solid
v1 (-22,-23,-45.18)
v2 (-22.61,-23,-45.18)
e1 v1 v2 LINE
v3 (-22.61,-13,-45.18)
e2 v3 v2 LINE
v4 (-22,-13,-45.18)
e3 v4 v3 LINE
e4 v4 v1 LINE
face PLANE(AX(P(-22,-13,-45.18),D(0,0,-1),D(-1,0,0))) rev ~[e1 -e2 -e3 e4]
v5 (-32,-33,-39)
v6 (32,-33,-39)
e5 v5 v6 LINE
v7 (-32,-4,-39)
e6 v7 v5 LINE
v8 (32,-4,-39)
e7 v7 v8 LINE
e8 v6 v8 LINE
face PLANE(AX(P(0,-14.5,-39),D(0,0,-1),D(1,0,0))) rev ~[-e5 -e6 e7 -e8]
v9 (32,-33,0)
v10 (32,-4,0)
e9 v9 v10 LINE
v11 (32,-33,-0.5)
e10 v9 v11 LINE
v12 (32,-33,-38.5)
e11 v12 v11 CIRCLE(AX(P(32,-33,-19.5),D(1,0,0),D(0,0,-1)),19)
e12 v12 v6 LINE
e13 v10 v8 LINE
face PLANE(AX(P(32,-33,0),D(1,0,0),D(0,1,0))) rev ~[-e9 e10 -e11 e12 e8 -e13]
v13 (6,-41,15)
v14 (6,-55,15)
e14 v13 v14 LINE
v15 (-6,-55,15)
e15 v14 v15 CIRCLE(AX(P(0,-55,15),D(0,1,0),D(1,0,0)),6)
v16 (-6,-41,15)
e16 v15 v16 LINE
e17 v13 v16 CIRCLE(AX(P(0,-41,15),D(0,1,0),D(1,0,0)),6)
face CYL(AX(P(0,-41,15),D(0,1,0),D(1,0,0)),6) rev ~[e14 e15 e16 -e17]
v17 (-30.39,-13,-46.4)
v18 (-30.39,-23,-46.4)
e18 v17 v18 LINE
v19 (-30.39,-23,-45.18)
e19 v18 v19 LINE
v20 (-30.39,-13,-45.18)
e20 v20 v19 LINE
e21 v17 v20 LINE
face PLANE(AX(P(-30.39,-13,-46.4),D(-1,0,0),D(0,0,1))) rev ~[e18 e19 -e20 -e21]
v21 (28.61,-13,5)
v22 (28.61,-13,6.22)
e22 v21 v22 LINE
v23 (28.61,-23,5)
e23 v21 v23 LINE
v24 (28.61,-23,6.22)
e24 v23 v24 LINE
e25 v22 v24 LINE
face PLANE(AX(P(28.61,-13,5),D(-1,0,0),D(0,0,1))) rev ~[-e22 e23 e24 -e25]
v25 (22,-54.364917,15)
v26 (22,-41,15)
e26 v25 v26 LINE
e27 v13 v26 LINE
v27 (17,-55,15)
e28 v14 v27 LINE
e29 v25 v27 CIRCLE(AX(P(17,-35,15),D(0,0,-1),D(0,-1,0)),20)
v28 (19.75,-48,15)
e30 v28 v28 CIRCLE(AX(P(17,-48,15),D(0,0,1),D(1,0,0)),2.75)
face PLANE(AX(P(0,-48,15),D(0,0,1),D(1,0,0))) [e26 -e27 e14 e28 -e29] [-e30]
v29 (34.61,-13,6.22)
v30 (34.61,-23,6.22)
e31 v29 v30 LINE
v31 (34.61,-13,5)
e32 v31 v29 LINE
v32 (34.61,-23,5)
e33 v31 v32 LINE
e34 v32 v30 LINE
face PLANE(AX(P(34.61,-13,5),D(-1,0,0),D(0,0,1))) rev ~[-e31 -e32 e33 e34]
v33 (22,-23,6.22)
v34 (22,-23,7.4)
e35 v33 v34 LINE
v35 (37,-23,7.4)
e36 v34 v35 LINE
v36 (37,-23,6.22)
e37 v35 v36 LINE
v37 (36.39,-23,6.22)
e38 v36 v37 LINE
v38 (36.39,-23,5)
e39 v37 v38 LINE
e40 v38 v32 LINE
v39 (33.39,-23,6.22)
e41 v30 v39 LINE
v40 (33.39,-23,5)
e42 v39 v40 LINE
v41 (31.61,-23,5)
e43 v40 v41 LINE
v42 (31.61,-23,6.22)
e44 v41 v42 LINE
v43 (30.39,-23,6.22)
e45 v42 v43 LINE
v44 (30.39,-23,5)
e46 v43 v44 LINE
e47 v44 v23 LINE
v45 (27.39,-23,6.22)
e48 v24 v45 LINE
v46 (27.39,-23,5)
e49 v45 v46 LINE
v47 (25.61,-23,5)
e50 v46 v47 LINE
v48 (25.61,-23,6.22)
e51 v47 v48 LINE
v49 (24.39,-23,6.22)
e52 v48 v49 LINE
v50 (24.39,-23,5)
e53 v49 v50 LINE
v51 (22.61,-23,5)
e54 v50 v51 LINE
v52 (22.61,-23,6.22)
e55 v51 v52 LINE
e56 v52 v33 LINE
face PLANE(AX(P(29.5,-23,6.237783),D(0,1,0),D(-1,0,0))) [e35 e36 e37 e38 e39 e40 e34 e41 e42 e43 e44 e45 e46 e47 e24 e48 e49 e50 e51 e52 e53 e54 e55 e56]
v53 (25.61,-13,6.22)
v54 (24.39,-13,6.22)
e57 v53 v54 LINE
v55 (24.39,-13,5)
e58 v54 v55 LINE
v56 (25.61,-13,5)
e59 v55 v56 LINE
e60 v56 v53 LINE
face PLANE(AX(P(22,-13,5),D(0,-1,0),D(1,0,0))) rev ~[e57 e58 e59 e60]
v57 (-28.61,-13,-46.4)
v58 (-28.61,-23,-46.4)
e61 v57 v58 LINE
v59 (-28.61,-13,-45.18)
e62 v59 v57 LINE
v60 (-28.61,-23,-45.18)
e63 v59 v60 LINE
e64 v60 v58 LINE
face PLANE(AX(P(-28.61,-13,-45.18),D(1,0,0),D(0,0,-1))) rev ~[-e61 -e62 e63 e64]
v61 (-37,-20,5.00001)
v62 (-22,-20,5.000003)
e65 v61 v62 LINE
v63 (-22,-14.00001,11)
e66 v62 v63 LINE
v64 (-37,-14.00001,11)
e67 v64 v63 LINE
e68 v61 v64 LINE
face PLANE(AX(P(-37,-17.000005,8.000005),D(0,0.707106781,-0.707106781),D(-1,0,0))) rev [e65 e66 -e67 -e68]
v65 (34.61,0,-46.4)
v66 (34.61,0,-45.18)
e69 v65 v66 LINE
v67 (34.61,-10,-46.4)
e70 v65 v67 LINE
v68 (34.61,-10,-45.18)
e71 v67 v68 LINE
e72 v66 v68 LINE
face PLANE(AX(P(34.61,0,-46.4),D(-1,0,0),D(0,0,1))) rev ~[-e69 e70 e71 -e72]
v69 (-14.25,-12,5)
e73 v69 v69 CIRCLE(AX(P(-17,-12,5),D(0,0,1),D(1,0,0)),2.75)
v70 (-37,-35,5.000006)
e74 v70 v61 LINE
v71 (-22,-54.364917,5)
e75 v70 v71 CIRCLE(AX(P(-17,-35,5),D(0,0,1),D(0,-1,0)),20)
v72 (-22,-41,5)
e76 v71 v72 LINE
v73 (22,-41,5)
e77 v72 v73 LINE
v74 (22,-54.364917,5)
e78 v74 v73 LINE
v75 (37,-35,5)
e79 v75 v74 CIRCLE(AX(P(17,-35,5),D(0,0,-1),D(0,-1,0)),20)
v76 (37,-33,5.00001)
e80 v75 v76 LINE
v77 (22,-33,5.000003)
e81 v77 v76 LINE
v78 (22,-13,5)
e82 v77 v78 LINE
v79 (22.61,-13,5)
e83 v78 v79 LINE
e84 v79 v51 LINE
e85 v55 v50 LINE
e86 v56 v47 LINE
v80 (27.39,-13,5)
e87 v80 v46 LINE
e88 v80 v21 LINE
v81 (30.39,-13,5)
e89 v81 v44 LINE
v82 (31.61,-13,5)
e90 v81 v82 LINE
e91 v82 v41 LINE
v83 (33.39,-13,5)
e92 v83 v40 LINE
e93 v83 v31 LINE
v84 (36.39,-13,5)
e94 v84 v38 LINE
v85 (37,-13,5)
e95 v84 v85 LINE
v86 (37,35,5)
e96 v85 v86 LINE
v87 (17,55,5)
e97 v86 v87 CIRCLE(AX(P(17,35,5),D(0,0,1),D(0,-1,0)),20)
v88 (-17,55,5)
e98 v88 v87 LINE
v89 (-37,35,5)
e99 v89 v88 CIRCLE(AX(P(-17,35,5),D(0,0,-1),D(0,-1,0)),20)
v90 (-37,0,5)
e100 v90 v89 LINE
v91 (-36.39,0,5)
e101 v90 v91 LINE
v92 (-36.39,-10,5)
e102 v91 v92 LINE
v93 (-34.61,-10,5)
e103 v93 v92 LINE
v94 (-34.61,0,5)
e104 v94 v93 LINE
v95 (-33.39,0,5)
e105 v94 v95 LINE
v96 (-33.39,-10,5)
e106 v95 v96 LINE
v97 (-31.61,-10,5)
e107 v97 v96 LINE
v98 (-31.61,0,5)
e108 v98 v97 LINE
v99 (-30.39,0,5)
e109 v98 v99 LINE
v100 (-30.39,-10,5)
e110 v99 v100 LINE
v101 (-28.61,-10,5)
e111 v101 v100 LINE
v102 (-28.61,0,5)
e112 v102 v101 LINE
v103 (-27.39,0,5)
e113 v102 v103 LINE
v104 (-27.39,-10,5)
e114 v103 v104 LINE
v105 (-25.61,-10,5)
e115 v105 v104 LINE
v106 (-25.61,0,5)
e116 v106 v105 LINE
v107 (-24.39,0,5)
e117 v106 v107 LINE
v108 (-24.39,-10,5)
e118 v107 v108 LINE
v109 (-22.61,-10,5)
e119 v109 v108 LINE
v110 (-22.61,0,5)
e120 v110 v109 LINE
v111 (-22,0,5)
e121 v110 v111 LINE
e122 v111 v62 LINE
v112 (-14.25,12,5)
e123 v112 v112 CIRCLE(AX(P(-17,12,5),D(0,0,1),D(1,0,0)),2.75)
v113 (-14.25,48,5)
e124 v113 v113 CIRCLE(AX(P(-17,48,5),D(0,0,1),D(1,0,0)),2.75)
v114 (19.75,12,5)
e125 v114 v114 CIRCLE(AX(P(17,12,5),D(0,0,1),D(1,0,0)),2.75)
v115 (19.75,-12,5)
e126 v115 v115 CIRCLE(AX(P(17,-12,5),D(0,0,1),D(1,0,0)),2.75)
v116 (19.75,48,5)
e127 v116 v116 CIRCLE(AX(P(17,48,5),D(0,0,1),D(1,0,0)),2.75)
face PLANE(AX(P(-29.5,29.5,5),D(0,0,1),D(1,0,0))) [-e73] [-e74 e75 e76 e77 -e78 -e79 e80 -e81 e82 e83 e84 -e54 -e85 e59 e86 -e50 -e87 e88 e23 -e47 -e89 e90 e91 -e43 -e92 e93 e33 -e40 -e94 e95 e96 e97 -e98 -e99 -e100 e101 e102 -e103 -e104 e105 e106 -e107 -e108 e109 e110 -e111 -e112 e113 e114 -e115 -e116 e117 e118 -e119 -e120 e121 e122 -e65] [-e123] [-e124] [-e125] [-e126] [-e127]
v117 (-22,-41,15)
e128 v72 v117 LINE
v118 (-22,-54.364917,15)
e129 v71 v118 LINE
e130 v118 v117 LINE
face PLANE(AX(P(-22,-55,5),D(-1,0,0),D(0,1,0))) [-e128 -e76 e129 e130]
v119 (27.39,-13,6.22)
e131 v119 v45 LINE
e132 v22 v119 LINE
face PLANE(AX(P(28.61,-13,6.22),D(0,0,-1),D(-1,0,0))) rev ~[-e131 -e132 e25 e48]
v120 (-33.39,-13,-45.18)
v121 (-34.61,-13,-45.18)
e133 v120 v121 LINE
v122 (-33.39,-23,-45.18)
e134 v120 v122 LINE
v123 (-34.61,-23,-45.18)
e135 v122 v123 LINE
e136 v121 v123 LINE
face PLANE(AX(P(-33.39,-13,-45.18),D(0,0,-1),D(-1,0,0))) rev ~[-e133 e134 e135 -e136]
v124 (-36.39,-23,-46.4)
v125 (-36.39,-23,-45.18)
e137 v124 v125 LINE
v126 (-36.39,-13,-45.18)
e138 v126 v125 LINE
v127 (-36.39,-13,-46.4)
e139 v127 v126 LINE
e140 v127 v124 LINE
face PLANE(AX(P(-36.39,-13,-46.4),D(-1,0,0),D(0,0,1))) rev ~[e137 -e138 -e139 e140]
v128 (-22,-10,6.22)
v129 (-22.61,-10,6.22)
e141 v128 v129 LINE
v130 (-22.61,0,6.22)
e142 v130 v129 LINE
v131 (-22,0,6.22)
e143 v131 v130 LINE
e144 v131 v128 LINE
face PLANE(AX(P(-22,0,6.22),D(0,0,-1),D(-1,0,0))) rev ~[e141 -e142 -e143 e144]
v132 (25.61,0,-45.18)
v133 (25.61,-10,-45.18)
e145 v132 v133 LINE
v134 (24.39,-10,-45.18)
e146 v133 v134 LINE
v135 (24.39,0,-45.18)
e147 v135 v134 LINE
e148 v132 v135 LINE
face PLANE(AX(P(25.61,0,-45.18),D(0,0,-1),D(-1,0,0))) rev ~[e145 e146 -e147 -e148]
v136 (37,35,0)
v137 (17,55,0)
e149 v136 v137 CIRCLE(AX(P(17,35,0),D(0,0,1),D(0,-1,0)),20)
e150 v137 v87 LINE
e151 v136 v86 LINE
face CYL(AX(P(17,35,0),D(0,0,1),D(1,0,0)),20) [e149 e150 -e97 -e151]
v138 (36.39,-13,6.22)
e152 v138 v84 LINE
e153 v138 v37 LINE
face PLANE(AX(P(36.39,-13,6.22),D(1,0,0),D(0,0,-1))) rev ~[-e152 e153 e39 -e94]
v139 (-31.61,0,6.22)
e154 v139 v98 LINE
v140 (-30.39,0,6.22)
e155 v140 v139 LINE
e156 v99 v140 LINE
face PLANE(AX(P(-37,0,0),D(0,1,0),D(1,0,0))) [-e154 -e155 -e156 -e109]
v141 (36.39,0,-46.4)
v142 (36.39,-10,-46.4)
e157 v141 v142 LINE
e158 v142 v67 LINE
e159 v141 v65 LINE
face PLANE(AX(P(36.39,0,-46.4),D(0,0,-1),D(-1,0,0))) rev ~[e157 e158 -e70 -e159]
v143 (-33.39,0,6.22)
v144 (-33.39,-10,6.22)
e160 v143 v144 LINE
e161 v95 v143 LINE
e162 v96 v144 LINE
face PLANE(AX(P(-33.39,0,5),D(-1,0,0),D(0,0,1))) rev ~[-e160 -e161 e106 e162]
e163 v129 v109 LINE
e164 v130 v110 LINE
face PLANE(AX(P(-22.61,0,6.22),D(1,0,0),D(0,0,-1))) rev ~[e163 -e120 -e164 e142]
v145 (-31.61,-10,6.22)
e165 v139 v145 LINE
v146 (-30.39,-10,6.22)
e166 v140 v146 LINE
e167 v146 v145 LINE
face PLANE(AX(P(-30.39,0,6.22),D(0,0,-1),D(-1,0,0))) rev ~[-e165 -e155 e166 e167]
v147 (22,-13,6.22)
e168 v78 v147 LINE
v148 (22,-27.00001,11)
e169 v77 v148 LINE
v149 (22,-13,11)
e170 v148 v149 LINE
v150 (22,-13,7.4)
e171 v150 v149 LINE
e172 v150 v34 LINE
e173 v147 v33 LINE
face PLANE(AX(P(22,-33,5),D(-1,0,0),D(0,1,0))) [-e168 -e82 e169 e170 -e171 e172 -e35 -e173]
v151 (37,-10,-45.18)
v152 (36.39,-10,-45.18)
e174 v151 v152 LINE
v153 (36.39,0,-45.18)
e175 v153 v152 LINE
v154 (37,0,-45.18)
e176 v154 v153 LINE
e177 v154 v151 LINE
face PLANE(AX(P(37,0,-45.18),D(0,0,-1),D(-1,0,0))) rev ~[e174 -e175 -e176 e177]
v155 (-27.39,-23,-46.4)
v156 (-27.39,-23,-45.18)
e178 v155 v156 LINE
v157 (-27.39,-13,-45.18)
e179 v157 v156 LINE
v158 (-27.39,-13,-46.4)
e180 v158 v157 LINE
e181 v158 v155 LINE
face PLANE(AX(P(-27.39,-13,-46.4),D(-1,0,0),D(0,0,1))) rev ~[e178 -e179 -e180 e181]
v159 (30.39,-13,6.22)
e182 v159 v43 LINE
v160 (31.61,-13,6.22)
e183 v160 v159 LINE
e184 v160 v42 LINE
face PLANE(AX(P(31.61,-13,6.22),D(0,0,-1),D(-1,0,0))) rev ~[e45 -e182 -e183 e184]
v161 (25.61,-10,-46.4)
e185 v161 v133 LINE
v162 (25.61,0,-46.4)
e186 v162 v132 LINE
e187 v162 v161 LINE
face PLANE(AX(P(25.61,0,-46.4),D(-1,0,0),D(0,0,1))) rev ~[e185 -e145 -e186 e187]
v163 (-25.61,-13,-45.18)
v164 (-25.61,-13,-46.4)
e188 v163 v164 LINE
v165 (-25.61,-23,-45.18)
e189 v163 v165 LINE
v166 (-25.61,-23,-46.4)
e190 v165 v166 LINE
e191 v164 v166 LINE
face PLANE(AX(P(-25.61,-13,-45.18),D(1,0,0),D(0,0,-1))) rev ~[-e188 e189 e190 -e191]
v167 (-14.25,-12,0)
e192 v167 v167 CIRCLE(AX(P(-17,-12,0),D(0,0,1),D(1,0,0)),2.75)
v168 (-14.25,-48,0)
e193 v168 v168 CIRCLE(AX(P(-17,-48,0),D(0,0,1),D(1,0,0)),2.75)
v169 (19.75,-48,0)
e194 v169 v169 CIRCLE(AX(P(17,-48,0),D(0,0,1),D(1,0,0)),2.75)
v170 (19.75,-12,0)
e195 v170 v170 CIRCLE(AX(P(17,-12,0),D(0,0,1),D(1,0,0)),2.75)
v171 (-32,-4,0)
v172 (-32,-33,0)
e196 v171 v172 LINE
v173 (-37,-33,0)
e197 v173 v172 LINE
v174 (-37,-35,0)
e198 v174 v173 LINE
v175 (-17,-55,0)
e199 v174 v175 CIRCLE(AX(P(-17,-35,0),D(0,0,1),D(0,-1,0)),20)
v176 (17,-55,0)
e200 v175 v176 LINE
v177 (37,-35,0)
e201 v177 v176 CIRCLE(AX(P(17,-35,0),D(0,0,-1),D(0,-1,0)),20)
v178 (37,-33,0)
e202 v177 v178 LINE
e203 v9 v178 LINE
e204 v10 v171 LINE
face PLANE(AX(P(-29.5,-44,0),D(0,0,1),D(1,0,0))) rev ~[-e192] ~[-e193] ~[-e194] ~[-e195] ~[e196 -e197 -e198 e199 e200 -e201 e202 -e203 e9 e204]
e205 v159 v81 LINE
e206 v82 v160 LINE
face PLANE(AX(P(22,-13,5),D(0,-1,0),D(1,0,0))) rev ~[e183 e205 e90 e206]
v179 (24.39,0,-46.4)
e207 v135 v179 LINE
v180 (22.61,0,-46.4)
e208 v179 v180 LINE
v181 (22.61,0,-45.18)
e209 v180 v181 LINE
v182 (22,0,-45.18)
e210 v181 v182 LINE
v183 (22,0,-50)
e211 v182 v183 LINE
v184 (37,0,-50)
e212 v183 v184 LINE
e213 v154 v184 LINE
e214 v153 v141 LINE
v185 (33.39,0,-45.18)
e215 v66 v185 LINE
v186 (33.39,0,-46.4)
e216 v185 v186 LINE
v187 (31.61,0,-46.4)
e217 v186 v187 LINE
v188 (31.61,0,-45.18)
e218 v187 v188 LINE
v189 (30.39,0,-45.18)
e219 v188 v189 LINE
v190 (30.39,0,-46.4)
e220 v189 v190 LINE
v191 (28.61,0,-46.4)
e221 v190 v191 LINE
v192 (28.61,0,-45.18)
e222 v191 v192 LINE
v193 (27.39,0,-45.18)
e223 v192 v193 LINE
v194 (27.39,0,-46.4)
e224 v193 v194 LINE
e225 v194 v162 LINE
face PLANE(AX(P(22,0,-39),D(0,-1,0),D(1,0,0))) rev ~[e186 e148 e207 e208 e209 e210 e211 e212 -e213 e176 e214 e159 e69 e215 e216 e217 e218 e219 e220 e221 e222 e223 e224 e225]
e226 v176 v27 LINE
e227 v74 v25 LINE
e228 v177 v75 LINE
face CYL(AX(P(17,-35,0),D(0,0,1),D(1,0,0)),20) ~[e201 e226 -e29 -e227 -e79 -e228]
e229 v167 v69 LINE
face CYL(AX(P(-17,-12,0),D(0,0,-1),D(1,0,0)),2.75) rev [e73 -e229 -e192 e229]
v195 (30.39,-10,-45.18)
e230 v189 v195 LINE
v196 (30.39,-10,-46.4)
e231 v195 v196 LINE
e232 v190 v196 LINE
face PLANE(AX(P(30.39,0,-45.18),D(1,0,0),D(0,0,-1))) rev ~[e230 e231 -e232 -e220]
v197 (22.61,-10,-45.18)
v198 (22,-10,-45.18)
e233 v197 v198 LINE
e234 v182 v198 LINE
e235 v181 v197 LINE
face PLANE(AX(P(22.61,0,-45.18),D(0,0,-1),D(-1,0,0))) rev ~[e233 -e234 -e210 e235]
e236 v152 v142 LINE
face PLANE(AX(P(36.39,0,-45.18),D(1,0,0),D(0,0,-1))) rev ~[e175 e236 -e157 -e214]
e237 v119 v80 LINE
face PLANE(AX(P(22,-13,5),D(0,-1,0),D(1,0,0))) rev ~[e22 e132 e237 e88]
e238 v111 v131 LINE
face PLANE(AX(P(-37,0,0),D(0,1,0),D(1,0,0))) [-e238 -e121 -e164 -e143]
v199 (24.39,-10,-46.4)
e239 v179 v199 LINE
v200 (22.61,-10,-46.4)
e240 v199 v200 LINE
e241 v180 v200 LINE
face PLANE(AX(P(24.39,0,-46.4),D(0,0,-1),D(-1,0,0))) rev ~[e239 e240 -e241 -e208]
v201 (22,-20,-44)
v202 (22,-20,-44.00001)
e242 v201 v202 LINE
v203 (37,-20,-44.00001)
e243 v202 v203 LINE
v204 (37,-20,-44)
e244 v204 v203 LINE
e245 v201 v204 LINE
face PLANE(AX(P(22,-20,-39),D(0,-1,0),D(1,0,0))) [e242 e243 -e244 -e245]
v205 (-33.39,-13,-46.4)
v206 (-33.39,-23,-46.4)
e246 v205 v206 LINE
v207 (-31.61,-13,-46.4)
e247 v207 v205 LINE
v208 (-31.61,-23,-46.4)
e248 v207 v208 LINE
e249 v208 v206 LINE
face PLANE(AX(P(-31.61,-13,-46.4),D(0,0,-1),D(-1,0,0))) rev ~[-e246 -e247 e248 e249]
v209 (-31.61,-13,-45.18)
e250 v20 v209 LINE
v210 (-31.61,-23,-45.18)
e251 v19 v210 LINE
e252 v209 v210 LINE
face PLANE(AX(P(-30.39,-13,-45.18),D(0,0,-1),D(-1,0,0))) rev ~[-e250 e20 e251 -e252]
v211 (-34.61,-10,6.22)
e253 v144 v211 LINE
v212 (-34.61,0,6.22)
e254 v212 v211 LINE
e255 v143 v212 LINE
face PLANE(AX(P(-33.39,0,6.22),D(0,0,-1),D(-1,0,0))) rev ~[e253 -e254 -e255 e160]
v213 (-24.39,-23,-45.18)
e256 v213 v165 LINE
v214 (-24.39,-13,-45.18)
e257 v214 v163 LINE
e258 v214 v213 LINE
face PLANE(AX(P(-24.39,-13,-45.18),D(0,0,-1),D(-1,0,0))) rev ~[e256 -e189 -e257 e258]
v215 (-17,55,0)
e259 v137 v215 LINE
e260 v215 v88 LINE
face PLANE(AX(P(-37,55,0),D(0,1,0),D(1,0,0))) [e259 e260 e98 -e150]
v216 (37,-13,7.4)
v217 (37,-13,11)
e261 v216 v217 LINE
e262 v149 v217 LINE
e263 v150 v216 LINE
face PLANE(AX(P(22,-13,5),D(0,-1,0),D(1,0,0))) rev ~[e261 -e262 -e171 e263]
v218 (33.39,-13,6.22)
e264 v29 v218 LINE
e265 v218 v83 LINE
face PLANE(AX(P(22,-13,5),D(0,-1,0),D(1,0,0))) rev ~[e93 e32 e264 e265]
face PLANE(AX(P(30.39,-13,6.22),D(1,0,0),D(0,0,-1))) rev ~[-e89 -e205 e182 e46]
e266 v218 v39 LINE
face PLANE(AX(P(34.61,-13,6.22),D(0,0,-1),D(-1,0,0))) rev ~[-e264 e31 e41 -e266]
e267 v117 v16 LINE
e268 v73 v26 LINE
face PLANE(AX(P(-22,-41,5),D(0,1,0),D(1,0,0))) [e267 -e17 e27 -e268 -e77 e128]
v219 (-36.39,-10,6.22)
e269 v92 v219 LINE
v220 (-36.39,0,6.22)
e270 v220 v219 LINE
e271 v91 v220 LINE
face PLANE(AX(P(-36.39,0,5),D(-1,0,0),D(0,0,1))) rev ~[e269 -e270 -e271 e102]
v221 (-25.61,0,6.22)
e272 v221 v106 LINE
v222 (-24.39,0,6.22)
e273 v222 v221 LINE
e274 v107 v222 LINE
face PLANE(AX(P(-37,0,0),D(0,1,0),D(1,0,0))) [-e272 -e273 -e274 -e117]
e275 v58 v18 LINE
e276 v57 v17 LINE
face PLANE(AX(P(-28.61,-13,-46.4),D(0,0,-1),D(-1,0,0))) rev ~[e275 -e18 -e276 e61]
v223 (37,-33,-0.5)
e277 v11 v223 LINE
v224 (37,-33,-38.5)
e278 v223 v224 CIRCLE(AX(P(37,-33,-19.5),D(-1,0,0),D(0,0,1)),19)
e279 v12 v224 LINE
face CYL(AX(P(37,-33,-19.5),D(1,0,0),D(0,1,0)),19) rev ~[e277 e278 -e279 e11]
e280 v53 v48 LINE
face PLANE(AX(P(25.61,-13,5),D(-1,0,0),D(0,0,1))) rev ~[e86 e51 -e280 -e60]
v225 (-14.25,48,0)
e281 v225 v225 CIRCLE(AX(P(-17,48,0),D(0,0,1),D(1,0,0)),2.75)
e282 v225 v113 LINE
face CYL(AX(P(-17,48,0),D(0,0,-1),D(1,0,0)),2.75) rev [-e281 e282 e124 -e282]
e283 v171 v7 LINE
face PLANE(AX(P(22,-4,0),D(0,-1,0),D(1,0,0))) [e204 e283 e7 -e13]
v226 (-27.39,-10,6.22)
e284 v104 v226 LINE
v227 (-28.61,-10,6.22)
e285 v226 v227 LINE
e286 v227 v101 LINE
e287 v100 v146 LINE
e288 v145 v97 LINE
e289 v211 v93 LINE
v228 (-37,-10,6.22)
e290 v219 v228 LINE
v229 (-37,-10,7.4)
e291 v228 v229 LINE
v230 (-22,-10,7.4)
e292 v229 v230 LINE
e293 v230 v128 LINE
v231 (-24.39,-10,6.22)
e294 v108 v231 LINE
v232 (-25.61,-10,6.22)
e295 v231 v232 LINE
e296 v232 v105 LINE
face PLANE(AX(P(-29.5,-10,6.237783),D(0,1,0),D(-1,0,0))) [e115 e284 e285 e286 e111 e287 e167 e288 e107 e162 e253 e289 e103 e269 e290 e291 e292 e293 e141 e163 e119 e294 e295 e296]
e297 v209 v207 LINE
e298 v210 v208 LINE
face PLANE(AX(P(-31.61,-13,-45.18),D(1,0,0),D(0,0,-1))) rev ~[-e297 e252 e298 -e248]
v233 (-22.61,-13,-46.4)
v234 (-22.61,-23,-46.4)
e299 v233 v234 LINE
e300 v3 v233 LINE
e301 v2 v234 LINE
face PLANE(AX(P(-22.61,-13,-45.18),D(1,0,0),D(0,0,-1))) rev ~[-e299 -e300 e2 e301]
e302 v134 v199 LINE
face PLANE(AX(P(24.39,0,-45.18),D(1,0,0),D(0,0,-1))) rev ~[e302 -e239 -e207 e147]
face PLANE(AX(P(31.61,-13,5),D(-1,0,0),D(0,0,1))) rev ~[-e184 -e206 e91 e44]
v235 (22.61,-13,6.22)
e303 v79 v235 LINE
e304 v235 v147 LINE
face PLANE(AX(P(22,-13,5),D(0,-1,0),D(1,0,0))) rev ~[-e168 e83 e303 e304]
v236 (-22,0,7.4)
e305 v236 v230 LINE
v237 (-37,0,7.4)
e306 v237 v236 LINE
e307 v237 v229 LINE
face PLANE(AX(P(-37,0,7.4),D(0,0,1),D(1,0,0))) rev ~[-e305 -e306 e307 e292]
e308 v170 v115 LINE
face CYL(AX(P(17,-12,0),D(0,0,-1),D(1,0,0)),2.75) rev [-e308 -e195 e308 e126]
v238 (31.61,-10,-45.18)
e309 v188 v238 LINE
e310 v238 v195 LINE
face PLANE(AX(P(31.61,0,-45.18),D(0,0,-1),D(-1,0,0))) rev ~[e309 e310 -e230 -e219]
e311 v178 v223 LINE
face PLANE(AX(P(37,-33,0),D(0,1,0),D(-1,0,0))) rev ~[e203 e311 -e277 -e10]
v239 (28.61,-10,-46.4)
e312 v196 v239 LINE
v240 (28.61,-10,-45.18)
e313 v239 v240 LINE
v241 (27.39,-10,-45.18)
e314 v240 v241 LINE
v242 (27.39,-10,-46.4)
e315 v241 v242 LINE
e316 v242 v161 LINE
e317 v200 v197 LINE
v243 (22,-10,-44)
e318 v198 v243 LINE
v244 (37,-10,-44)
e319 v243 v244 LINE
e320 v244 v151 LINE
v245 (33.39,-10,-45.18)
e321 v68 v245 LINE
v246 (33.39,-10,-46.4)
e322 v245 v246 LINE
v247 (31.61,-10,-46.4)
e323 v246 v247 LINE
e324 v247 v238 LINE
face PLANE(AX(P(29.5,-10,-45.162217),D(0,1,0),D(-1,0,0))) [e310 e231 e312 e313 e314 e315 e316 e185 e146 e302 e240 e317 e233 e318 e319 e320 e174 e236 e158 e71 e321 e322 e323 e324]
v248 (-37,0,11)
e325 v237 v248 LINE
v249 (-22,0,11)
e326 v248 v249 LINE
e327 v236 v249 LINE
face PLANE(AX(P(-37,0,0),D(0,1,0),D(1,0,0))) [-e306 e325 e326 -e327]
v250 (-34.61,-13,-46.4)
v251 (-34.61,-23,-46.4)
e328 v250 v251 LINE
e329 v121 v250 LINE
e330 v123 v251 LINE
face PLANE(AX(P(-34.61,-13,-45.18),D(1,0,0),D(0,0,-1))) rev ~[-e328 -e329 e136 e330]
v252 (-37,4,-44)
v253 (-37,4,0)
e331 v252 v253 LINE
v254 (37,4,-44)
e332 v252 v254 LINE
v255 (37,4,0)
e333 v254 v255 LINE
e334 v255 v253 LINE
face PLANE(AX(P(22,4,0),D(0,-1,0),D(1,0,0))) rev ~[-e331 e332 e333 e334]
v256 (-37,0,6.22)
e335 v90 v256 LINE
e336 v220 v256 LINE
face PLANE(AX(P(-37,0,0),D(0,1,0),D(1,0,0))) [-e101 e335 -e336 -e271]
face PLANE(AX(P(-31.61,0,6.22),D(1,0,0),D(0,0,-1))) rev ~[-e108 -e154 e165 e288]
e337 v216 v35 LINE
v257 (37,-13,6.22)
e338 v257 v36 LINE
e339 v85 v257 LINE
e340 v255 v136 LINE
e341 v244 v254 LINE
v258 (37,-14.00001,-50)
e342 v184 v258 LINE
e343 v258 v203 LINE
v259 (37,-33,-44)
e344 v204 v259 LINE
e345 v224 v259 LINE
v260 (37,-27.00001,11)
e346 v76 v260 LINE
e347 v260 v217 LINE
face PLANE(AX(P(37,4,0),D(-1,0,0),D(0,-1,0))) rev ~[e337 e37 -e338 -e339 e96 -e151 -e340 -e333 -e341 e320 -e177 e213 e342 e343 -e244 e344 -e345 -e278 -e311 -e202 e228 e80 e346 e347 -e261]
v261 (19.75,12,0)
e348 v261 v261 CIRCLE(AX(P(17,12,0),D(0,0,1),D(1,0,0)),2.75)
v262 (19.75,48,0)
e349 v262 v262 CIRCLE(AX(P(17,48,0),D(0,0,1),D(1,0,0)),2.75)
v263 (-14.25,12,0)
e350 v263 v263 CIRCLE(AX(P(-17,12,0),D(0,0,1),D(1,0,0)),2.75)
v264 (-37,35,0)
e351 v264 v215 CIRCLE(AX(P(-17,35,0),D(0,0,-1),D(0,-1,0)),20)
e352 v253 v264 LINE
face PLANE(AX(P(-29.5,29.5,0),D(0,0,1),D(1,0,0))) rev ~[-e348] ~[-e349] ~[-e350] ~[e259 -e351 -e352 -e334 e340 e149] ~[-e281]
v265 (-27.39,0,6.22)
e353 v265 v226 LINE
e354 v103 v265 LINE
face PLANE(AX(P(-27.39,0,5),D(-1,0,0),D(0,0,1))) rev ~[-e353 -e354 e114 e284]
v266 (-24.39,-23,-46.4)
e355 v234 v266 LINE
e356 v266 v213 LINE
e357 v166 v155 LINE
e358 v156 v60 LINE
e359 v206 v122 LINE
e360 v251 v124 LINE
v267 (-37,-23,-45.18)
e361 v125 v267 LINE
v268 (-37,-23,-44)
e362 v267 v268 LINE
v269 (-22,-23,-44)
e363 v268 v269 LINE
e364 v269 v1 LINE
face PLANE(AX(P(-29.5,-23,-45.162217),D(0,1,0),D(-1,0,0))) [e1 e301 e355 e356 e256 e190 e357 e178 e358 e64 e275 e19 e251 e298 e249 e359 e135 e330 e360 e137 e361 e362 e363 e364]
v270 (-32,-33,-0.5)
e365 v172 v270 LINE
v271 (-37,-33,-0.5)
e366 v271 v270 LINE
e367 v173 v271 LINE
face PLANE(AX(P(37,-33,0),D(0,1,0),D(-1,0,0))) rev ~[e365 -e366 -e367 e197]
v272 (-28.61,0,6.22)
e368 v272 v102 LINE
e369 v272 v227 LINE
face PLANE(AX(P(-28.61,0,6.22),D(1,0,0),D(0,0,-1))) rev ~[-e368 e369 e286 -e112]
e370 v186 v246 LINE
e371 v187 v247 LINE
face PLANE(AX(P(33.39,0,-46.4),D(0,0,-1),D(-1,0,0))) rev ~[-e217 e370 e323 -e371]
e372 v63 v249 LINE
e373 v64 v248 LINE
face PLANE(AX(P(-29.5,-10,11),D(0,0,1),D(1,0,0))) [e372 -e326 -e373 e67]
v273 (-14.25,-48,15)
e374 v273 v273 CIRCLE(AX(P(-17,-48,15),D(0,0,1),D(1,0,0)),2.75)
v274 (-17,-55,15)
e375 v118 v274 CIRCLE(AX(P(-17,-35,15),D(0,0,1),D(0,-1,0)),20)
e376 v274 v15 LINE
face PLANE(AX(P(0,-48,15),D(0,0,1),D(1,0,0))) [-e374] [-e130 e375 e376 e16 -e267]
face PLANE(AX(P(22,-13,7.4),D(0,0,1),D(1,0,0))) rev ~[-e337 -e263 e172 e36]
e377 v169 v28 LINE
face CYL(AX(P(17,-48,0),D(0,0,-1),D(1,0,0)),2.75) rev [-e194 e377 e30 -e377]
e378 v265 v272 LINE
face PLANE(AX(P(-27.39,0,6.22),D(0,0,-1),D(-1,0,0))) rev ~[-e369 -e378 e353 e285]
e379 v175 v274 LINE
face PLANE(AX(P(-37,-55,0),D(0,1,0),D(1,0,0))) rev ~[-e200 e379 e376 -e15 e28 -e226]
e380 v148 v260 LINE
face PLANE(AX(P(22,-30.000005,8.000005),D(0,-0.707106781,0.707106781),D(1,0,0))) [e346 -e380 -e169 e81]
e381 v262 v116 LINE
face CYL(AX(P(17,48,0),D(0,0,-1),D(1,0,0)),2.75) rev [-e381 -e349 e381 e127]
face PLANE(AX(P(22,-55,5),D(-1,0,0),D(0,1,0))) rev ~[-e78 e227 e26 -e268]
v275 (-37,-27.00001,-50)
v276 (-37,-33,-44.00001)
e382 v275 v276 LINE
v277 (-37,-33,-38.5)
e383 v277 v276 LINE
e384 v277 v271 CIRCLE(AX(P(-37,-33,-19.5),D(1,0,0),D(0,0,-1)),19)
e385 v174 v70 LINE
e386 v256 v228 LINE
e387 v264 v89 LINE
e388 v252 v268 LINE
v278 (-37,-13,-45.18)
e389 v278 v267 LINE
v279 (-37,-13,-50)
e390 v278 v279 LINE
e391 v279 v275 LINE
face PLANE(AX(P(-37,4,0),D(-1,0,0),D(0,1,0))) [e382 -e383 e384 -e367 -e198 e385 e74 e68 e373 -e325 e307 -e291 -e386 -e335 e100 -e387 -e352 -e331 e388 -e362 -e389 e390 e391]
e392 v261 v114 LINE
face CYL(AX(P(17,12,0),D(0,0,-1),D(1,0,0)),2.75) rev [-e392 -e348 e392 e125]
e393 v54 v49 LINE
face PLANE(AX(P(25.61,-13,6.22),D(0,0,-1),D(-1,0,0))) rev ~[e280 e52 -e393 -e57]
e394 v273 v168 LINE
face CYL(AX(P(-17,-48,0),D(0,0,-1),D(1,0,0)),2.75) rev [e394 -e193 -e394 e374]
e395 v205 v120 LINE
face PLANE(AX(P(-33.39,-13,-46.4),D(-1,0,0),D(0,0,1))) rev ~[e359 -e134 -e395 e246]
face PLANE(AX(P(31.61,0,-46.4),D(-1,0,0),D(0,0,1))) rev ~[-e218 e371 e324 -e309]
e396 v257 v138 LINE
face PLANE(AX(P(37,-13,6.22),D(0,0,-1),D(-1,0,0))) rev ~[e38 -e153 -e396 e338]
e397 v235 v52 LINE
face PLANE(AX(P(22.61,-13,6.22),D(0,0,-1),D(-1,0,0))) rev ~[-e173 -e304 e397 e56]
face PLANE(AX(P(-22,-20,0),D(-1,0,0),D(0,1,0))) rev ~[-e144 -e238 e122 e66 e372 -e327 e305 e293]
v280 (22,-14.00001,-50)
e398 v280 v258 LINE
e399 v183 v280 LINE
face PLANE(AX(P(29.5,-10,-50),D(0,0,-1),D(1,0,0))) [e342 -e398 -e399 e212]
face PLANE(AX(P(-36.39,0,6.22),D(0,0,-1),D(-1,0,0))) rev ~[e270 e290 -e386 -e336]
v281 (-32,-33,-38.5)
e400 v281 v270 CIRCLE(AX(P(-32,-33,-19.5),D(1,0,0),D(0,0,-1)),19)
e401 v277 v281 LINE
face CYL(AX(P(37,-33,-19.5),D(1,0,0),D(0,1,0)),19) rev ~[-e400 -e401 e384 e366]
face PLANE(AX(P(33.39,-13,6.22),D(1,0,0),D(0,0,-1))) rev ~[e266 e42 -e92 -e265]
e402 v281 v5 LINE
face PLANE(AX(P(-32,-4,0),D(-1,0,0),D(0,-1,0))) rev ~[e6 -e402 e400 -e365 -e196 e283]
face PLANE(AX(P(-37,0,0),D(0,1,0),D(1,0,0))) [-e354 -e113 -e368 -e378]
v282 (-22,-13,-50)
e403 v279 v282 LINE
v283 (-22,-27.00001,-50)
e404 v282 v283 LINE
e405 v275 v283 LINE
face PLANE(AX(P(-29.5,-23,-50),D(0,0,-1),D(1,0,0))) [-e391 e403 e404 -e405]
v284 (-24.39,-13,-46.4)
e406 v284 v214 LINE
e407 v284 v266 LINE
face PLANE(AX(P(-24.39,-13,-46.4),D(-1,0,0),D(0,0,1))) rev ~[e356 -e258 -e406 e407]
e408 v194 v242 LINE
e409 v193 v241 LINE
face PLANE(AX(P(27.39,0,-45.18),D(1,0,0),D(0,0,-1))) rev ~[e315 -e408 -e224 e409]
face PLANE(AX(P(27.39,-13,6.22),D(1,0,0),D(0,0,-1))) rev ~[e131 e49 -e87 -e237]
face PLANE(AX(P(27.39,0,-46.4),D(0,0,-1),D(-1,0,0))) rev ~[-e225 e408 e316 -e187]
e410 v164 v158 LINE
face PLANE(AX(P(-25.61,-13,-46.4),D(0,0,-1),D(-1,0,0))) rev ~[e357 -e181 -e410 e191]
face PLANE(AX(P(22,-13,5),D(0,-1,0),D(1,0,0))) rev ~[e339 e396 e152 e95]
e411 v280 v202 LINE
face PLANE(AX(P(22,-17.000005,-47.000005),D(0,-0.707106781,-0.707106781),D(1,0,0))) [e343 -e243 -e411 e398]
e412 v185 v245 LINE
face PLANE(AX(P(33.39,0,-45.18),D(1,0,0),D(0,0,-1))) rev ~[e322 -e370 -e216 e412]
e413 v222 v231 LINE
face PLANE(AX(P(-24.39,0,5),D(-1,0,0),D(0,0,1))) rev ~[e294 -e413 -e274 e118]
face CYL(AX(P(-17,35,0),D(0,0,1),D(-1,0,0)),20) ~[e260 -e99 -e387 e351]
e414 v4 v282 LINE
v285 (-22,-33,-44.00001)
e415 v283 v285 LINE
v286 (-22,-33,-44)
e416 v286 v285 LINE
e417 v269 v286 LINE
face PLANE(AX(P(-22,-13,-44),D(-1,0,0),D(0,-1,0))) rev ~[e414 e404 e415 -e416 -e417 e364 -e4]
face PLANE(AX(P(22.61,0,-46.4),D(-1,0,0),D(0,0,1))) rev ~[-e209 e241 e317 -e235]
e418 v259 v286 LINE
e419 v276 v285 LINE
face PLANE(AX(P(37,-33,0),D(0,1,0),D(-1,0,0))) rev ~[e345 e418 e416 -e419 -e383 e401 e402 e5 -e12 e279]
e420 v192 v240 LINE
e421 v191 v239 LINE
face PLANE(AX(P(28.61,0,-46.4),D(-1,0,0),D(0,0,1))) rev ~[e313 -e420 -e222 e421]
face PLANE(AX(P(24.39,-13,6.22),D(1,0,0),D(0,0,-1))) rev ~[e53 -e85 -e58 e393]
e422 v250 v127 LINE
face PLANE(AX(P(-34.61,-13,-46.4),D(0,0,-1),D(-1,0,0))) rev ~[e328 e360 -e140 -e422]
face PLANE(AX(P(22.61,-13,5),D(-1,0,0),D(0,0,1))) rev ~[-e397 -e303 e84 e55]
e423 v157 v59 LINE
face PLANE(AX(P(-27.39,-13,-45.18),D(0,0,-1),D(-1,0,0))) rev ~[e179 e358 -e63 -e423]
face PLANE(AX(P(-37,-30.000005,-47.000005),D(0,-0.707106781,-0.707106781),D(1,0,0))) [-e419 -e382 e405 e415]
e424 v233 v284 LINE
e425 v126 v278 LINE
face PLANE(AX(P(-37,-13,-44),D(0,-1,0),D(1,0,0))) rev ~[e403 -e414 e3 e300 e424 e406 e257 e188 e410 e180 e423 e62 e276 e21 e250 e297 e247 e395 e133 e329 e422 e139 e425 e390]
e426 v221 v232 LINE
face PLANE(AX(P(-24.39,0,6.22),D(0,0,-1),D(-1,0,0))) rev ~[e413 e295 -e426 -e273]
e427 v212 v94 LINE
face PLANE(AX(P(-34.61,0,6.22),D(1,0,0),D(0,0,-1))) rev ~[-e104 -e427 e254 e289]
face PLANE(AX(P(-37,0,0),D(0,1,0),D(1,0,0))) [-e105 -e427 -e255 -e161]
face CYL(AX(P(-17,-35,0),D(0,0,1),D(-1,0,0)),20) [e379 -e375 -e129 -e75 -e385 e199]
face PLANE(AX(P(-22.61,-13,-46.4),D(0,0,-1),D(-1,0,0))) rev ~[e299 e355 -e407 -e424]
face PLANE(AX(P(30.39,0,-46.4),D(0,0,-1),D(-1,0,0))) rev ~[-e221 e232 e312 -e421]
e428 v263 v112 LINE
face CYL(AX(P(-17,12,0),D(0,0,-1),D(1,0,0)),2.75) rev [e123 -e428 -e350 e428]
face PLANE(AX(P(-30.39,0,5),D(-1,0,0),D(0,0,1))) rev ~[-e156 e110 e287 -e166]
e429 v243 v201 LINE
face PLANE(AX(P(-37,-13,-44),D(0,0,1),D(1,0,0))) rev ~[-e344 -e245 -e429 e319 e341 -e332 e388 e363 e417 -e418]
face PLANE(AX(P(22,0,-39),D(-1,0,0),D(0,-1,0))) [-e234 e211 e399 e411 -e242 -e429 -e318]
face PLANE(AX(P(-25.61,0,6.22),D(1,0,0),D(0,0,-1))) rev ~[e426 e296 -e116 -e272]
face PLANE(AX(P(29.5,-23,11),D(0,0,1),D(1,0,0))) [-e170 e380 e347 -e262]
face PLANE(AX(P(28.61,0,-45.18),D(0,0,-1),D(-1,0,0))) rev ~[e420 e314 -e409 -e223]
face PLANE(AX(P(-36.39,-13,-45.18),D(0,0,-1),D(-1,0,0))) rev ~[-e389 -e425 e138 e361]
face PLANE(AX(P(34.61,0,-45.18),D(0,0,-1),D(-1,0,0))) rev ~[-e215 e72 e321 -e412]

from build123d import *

# Parameters (mm, degrees)
F0_R      = 2.75
F1_DEPTH  = 5
F2_W      = 15
F2_H      = 20
F3_DEPTH  = 6
F4_DEPTH  = 5
F5_W      = 15
F5_H      = 20
F6_DEPTH  = 11
F8_W      = 44
F8_H      = 8
F9_DEPTH  = 39
F10_W     = 15
F10_H     = 20
F11_DEPTH = 11
F13_W     = 44
F13_H     = 37
F13_W_2   = 15
F14_DEPTH = 5
F15_DEPTH = 10
F16_W     = 15
F16_H     = 20
F17_DEPTH = 6
F18_DEPTH = 5
F20_DEPTH = 10
F21_SIZE  = 5.99999
F22_W     = 15
F22_H     = 13
F22_H_2   = 4
F22_H_3   = 17
F23_DEPTH = 5
F24_W     = 10
F24_H     = 8
F25_DEPTH = 39
F26_DEPTH = 10
F27_W     = 44
F27_H     = 14
F28_DEPTH = 10
F30_DEPTH = 14
F31_DEPTH = 15
F32_R     = 19
F33_DEPTH = 74
F35_DEPTH = 10
F36_W     = 15
F36_H     = 51
F36_H_2   = 22
F37_DEPTH = 5
F38_R     = 20


# Not quite as in the source:
# - a fillet or chamfer is up to 0.001 mm smaller than in the source, because OpenCascade refuses the exact size


with BuildPart() as f1:
    # F0 (on Top) → F1 (new body)
    with BuildSketch(Plane.XY):
        Polygon((0, 55), (-22, 55), (-22, -55), (0, -55), (22, -55), (22, 55), align=None)
        with Locations((-17, -48)):
            Circle(F0_R, mode=Mode.SUBTRACT)
        with Locations((-17, -12)):
            Circle(F0_R, mode=Mode.SUBTRACT)
        with Locations((17, -48)):
            Circle(F0_R, mode=Mode.SUBTRACT)
        with Locations((17, -12)):
            Circle(F0_R, mode=Mode.SUBTRACT)
        with Locations((-17, 12)):
            Circle(F0_R, mode=Mode.SUBTRACT)
        with Locations((-17, 48)):
            Circle(F0_R, mode=Mode.SUBTRACT)
        with Locations((17, 12)):
            Circle(F0_R, mode=Mode.SUBTRACT)
        with Locations((17, 48)):
            Circle(F0_R, mode=Mode.SUBTRACT)
    extrude(amount=F1_DEPTH)



with BuildPart() as f3:
    # F2 (on face) → F3 (new body)
    with BuildSketch(Plane.XY.offset(5)):
        with Locations((29.5, -23)):
            Rectangle(F2_W, F2_H)
    extrude(amount=F3_DEPTH)


with BuildPart() as f1_1:
    add(f1.part)
    # F4 (add): a face of the model
    f4_faces = [f3.part.faces().sort_by_distance(p)[0] for p in [
        (29.5, -23, 5),
    ]]

    add(f3.part)  # F4 merges F3
    extrude(f4_faces, amount=F4_DEPTH)

    # F5 (on Top) → F6 (join)
    with BuildSketch(Plane.XY):
        with Locations((-29.5, -10)):
            Rectangle(F5_W, F5_H)
    extrude(amount=F6_DEPTH)

    # F8 (on face) → F9 (join)
    with BuildSketch(Plane.XY):
        Rectangle(F8_W, F8_H)
    extrude(amount=-F9_DEPTH)

    # F10 (on face) → F11 (join)
    with BuildSketch(Plane(origin=(0, 0, -39), x_dir=(1, 0, 0), z_dir=(0, 0, -1))):
        with Locations((29.5, 10)):
            Rectangle(F10_W, F10_H)
    extrude(amount=F11_DEPTH)

    # F13 (on face) → F14 (join)
    with BuildSketch(Plane(origin=(0, 0, -39), x_dir=(1, 0, 0), z_dir=(0, 0, -1))):
        with Locations((0, 14.5)):
            Rectangle(F13_W, F13_H)
        with Locations((29.5, 14.5)):
            Rectangle(F13_W_2, F13_H)
        with Locations((-29.5, 14.5)):
            Rectangle(F13_W_2, F13_H)
    extrude(amount=F14_DEPTH)

    # F12 (on face) → F15 (cut)
    with BuildSketch(Plane(origin=(0, 0, 0), x_dir=(-1, 0, 0), z_dir=(0, 1, 0))):
        Polygon((-36.39, -45.18), (-36.39, -46.4), (-34.61, -46.4), (-34.61, -45.18), (-33.39, -45.18), (-33.39, -46.4), (-31.61, -46.4), (-31.61, -45.18), (-30.39, -45.18), (-30.39, -46.4), (-28.61, -46.4), (-28.61, -45.18), (-27.39, -45.18), (-27.39, -46.4), (-25.61, -46.4), (-25.61, -45.18), (-24.39, -45.18), (-24.39, -46.4), (-22.61, -46.4), (-22.61, -45.18), (-22, -45.18), (-22, -44), (-37, -44), (-37, -45.18), align=None)
    extrude(amount=-F15_DEPTH, mode=Mode.SUBTRACT)



with BuildPart() as f17:
    # F16 (on face) → F17 (new body)
    with BuildSketch(Plane(origin=(0, 0, -44), x_dir=(1, 0, 0), z_dir=(0, 0, -1))):
        with Locations((-29.5, 23)):
            Rectangle(F16_W, F16_H)
    extrude(amount=F17_DEPTH)


with BuildPart() as f1_2:
    add(f1_1.part)
    # F18 (add): a face of the model
    f18_faces = [f17.part.faces().sort_by_distance(p)[0] for p in [
        (-29.5, -23, -44),
    ]]

    add(f17.part)  # F18 merges F17
    extrude(f18_faces, amount=F18_DEPTH)

    # F19 (on face) → F20 (cut)
    with BuildSketch(Plane(origin=(0, -13, 0), x_dir=(-1, 0, 0), z_dir=(0, 1, 0))):
        Polygon((22.61, -45.18), (22.61, -46.4), (24.39, -46.4), (24.39, -45.18), (25.61, -45.18), (25.61, -46.4), (27.39, -46.4), (27.39, -45.18), (28.61, -45.18), (28.61, -46.4), (30.39, -46.4), (30.39, -45.18), (31.61, -45.18), (31.61, -46.4), (33.39, -46.4), (33.39, -45.18), (34.61, -45.18), (34.61, -46.4), (36.39, -46.4), (36.39, -45.18), (37, -45.18), (37, -44), (22, -44), (22, -45.18), align=None)
    extrude(amount=-F20_DEPTH, mode=Mode.SUBTRACT)

    # F21 (size 6 in the source; OpenCascade refuses exactly that, so slightly less here)
    f21_edges = [f1_2.edges().sort_by_distance(p)[0] for p in [
        (-29.5, -20, 11),
        (29.5, -33, 11),
        (29.5, -20, -50),
        (-29.5, -33, -50),
    ]]
    chamfer(f21_edges, length=F21_SIZE)

    # F22 (on Top) → F23 (join)
    with BuildSketch(Plane.XY):
        with Locations((-29.5, -26.5)):
            Rectangle(F22_W, F22_H)
        with Locations((-29.5, 2)):
            Rectangle(F22_W, F22_H_2)
        with Locations((29.5, -4.5)):
            Rectangle(F22_W, F22_H_3)
    extrude(amount=F23_DEPTH)

    # F24 (on face) → F25 (join)
    with BuildSketch(Plane(origin=(0, 0, 0), x_dir=(1, 0, 0), z_dir=(0, 0, -1))):
        Polygon((32, -4), (37, -4), (37, 33), (32, 33), (32, 4), align=None)
        with Locations((27, 0)):
            Rectangle(F24_W, F24_H)
        Polygon((-37, 33), (-37, -4), (-32, -4), (-32, 4), (-32, 33), align=None)
        with Locations((-27, 0)):
            Rectangle(F24_W, F24_H)
    extrude(amount=F25_DEPTH)

    # F7 (on face) → F26 (cut)
    with BuildSketch(Plane(origin=(0, 0, 0), x_dir=(-1, 0, 0), z_dir=(0, 1, 0))):
        Polygon((22.61, 6.22), (22.61, 5), (24.39, 5), (24.39, 6.22), (25.61, 6.22), (25.61, 5), (27.39, 5), (27.39, 6.22), (28.61, 6.22), (28.61, 5), (30.39, 5), (30.39, 6.22), (31.61, 6.22), (31.61, 5), (33.39, 5), (33.39, 6.22), (34.61, 6.22), (34.61, 5), (36.39, 5), (36.39, 6.22), (37, 6.22), (37, 7.4), (22, 7.4), (22, 6.22), align=None)
    extrude(amount=-F26_DEPTH, mode=Mode.SUBTRACT)

    # F27 (on face) → F28 (join)
    with BuildSketch(Plane.XY.offset(5)):
        with Locations((0, -48)):
            Rectangle(F27_W, F27_H)
    extrude(amount=F28_DEPTH)

    # F29 (on face) → F30 (cut)
    with BuildSketch(Plane(origin=(0, -41, 0), x_dir=(-1, 0, 0), z_dir=(0, 1, 0))):
        with BuildLine():
            Line((-6, 15), (6, 15))
            ThreePointArc((6, 15), (0, 21), (-6, 15))
        make_face()
        with BuildLine():
            ThreePointArc((-6, 15), (0, 9), (6, 15))
            Line((6, 15), (-6, 15))
        make_face()
    extrude(amount=-F30_DEPTH, mode=Mode.SUBTRACT)

    # F0 (on Top) → F31 (cut)
    with BuildSketch(Plane.XY):
        with Locations((-17, -48)):
            Circle(F0_R)
        with Locations((17, -48)):
            Circle(F0_R)
    extrude(amount=F31_DEPTH, mode=Mode.SUBTRACT)

    # F32 (on face) → F33 (cut)
    with BuildSketch(Plane.YZ.offset(37)):
        with Locations((-33, -19.5)):
            Circle(F32_R)
    extrude(amount=-F33_DEPTH, mode=Mode.SUBTRACT)

    # F34 (on face) → F35 (cut)
    with BuildSketch(Plane(origin=(0, -13, 0), x_dir=(-1, 0, 0), z_dir=(0, 1, 0))):
        Polygon((-36.39, 6.22), (-36.39, 5), (-34.61, 5), (-34.61, 6.22), (-33.39, 6.22), (-33.39, 5), (-31.61, 5), (-31.61, 6.22), (-30.39, 6.22), (-30.39, 5), (-28.61, 5), (-28.61, 6.22), (-27.39, 6.22), (-27.39, 5), (-25.61, 5), (-25.61, 6.22), (-24.39, 6.22), (-24.39, 5), (-22.61, 5), (-22.61, 6.22), (-22, 6.22), (-22, 7.4), (-37, 7.4), (-37, 6.22), align=None)
    extrude(amount=-F35_DEPTH, mode=Mode.SUBTRACT)

    # F36 (on Top) → F37 (join)
    with BuildSketch(Plane.XY):
        with Locations((-29.5, 29.5)):
            Rectangle(F36_W, F36_H)
        with Locations((29.5, 29.5)):
            Rectangle(F36_W, F36_H)
        with Locations((-29.5, -44)):
            Rectangle(F36_W, F36_H_2)
        with Locations((29.5, -44)):
            Rectangle(F36_W, F36_H_2)
    extrude(amount=F37_DEPTH)

    # F38
    f38_edges = [f1_2.edges().sort_by_distance(p)[0] for p in [
        (-37, -55, 2.5),
        (37, -55, 2.5),
        (37, 55, 2.5),
        (-37, 55, 2.5),
    ]]
    fillet(f38_edges, radius=F38_R)


solid = f1_2.part
